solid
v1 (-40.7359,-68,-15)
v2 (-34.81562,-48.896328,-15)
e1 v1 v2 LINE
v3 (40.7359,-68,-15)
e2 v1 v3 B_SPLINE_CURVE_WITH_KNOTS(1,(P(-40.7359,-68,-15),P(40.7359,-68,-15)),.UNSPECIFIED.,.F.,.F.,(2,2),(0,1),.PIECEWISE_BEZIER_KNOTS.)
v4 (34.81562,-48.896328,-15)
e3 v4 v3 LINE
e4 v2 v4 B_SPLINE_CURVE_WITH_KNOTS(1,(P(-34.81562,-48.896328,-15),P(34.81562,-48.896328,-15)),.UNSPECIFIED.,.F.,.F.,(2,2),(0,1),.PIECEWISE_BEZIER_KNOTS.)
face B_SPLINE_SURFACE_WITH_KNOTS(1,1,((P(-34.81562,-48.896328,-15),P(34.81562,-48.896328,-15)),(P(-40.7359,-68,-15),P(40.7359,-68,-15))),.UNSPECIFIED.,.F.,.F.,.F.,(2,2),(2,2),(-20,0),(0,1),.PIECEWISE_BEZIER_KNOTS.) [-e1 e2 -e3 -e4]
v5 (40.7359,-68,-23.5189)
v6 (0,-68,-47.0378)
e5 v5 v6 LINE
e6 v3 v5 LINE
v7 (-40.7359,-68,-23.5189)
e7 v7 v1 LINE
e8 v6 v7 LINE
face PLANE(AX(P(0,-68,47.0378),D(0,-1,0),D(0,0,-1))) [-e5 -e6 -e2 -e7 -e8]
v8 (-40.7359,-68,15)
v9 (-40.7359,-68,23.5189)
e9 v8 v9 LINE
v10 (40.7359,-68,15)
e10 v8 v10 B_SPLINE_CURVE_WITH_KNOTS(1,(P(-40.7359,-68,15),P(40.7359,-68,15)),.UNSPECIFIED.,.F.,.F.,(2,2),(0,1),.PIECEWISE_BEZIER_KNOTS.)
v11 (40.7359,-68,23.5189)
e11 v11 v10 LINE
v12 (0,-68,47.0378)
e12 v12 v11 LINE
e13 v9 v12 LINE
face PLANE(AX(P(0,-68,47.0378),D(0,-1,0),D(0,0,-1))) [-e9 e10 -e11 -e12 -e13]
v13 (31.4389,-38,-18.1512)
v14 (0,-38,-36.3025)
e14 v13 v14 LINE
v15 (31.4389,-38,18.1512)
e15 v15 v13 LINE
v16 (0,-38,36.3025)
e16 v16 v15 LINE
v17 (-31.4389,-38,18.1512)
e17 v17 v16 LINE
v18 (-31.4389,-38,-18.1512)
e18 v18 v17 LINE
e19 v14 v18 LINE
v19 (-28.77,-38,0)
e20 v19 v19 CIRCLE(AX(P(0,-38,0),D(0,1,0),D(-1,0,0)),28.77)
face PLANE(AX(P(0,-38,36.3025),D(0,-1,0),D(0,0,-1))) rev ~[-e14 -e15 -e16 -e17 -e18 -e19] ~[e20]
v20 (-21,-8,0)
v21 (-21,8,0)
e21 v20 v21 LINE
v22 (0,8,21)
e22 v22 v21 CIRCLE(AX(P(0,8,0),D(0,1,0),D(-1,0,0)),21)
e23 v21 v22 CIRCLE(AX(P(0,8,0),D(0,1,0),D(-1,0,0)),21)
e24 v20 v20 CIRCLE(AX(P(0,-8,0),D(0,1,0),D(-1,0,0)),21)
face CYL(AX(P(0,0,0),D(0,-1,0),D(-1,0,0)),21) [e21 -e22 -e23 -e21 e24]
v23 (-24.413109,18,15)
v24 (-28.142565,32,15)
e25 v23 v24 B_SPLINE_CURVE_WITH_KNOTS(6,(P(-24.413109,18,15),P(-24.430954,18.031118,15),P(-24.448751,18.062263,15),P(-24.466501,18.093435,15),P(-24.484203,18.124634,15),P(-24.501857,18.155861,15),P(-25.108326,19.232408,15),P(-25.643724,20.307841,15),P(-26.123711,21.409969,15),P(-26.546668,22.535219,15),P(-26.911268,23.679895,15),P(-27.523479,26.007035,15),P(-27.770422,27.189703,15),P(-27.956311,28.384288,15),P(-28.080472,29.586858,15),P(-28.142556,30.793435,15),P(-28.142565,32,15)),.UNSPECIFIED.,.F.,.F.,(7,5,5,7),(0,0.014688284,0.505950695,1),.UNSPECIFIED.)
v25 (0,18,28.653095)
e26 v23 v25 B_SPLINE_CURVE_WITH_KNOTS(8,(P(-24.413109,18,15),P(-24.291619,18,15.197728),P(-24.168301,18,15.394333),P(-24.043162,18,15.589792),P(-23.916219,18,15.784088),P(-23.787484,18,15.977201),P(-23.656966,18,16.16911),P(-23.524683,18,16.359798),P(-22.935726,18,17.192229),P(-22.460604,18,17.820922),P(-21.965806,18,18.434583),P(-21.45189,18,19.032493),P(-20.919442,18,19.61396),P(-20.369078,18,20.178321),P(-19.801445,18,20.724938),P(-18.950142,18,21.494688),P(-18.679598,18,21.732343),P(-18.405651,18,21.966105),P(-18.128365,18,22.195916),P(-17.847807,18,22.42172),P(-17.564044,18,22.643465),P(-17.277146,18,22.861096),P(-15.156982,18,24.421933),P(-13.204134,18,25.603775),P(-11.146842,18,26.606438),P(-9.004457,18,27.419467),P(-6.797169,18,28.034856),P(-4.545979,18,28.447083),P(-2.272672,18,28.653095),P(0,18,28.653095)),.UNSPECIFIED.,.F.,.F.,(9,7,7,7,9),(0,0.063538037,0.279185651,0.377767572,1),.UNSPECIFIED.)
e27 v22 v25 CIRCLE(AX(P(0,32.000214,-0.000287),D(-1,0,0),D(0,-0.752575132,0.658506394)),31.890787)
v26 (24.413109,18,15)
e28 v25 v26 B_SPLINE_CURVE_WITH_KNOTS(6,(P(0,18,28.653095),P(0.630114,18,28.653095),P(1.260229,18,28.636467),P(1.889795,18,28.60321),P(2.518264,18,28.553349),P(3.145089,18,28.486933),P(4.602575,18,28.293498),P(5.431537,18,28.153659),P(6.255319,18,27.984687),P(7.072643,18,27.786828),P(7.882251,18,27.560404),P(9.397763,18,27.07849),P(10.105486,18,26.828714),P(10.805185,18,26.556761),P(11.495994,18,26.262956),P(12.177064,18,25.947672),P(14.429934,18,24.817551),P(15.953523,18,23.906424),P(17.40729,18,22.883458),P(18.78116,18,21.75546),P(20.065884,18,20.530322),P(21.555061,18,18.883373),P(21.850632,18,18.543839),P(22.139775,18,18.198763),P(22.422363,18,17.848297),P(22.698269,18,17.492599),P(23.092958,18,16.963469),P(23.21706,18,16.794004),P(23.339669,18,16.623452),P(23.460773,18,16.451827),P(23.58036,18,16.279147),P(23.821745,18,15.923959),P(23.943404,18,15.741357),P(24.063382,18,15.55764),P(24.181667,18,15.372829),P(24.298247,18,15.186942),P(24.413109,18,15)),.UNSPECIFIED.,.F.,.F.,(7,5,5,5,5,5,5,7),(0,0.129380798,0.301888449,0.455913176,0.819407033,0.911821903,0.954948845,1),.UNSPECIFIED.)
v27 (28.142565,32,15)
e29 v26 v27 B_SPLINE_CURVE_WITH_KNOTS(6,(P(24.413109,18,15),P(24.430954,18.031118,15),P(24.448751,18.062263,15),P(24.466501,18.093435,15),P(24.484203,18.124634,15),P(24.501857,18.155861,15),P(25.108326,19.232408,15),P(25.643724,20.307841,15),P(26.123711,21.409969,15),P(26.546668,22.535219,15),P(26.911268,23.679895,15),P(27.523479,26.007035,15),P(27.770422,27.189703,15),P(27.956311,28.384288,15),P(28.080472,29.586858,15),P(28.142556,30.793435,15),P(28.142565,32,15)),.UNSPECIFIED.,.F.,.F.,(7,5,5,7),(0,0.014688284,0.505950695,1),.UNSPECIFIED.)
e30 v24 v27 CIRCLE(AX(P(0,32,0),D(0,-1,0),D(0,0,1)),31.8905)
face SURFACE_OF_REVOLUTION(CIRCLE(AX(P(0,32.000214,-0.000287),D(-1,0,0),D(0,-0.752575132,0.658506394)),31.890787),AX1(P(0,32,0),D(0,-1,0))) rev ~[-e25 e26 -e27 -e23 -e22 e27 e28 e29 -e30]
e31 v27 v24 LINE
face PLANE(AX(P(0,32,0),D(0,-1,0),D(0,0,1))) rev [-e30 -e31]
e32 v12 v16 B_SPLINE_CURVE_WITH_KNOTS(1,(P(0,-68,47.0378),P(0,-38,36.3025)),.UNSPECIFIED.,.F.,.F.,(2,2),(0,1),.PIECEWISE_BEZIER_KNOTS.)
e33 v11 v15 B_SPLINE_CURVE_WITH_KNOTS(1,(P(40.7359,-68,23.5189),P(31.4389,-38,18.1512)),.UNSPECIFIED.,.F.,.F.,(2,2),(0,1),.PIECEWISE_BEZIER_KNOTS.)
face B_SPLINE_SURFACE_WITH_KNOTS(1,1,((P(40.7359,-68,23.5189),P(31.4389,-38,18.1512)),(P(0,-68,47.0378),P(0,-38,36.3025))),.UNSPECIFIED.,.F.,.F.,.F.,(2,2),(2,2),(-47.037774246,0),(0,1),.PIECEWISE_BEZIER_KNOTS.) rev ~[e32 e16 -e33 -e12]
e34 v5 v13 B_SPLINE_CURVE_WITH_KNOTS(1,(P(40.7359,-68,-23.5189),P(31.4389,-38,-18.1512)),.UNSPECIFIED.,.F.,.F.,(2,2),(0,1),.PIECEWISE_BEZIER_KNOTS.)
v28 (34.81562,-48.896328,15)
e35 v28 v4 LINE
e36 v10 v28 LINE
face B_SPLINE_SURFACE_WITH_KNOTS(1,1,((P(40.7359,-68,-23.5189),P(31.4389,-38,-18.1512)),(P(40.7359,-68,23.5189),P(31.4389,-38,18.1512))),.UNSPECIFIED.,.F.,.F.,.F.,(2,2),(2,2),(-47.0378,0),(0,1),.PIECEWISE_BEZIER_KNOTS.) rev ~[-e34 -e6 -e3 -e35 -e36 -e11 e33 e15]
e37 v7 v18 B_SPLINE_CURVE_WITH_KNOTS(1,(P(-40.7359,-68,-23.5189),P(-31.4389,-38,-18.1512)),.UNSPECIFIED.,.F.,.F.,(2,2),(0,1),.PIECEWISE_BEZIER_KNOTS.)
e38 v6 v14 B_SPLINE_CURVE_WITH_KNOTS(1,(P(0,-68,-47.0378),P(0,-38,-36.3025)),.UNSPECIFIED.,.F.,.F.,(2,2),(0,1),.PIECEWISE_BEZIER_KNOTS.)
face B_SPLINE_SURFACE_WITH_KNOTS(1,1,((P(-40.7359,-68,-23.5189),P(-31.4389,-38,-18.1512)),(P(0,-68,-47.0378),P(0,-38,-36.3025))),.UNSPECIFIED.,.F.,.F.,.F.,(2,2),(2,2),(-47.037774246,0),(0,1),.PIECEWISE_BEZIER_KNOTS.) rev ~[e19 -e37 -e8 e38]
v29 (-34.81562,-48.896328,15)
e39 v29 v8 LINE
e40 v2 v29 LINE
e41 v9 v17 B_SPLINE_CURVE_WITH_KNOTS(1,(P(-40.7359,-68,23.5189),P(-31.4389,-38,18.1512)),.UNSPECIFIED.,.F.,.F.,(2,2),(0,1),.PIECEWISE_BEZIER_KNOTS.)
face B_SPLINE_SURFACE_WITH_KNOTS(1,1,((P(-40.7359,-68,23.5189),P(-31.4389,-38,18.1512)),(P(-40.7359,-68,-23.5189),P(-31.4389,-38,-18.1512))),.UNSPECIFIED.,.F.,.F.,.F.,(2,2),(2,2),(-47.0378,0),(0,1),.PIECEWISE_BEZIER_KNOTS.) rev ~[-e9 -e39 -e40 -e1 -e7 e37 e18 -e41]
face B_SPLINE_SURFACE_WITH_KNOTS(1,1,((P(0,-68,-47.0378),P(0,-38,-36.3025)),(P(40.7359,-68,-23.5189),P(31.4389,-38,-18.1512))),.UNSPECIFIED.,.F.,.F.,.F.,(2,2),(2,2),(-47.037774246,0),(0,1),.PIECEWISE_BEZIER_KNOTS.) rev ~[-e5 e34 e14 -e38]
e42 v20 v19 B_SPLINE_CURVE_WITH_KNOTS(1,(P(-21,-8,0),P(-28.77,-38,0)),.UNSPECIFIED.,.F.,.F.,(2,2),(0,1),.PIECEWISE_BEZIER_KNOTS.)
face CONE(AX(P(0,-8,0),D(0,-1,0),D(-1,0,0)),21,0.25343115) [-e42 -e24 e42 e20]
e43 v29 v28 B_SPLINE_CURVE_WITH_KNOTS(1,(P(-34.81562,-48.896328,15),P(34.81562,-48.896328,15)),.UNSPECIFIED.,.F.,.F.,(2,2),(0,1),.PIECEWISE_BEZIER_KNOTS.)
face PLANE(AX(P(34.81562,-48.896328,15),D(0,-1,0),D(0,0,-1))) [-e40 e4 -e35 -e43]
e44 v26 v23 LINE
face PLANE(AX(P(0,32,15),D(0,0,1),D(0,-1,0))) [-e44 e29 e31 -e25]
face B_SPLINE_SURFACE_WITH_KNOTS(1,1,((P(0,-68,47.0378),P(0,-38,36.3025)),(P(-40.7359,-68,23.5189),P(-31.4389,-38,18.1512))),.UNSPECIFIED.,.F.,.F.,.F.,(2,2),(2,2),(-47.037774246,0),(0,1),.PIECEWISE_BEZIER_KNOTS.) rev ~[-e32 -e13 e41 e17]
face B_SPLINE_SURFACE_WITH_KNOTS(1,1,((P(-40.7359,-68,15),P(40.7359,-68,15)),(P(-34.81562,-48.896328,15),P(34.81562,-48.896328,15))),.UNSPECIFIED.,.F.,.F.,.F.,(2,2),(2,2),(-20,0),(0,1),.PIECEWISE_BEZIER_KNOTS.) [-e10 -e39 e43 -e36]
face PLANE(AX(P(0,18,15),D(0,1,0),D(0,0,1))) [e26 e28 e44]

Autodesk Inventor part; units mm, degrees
ref_plane "YZ Plane" through (0, 0, 0) normal (1, 0, 0) x (0, 1, 0)
ref_plane "XZ Plane" through (0, 0, 0) normal (0, 1, 0) x (-1, 0, 0)
ref_plane "XY Plane" through (0, 0, 0) normal (0, 0, 1) x (1, 0, 0)
sketch "Sketch2" plane through (0, 0, 0) normal (0, 1, 0) x (-1, 0, 0)
  circle A0 centre (0, 0) radius 21
  dimension "d1" = 42
extrude "Extrusion1" add sketch "Sketch2" along normal mid plane 16
sketch "Sketch3" plane through (0, -8, 0) normal (0, -1, 0) x (1, 0, 0)
  circle A0 centre (0, 0) radius 21
  dimension "d4" = 42
ref_plane "Work Plane1" through (0, -38, 0) normal (0, -1, 0) x (1, 0, 0)
sketch "Sketch4" plane through (0, -38, 0) normal (0, -1, 0) x (1, 0, 0)
  circle A0 centre (0, 0) radius 28.77
  dimension "d6" = 57.54
loft "Loft1" add profiles "Sketch4" section 1 edges at (21, -8, 0)
sketch "Sketch5" plane through (0, -38, 0) normal (0, -1, 0) x (1, 0, 0)
  circle A0 centre (0, 0) radius 28.77 projected
  line L0 (0, 0) -> (28.77, 0) construction
  line L1 (0, 36.3025) -> (31.4389, 18.1512)
  line L2 (31.4389, 18.1512) -> (31.4389, -18.1512)
  line L3 (31.4389, -18.1512) -> (0, -36.3025)
  line L4 (0, -36.3025) -> (-31.4389, -18.1512)
  line L5 (-31.4389, -18.1512) -> (-31.4389, 18.1512)
  line L6 (-31.4389, 18.1512) -> (0, 36.3025)
ref_plane "Work Plane2" through (0, -68, 0) normal (0, -1, 0) x (1, 0, 0)
sketch "Sketch6" plane through (0, -38, 0) normal (0, -1, 0) x (1, 0, 0)
  point P0 (0, 0)
sketch "Sketch8" plane through (0, -68, 0) normal (0, -1, 0) x (1, 0, 0)
  line L0 (0, 47.0378) -> (40.7359, 23.5189)
  line L1 (40.7359, 23.5189) -> (40.7359, -23.5189)
  line L2 (40.7359, -23.5189) -> (0, -47.0378)
  line L3 (0, -47.0378) -> (-40.7359, -23.5189)
  line L4 (-40.7359, -23.5189) -> (-40.7359, 23.5189)
  line L5 (-40.7359, 23.5189) -> (0, 47.0378)
  point P0 (0, 0)
  point P1 (0, 0)
loft "Loft3" add profiles "Sketch8", "Sketch5" contours all / A0 | L1 L2 L3 L4 L5 L6
sketch "Sketch9" plane through (-40.7359, -68, -23.5189) normal (-0.9551836, 0.296014, 0) x (0, 0, 1)
  line L0 (0, 0) -> (47.0378, 0) projected
  line L1 (23.5189, 0) -> (16.0189, 0)
  line L2 (31.0189, 0) -> (23.5189, 0)
  line L3 (31.0189, 0) -> (16.0189, 0)
  line L4 (16.0189, 20) -> (31.0189, 20)
  line L5 (23.5189, 0) -> (8.5189, 0)
  line L6 (8.5189, 0) -> (8.5189, 20)
  line L7 (8.5189, 20) -> (38.5189, 20)
  line L8 (38.5189, 20) -> (38.5189, 0)
  point P0 (23.5189, 77.0109)
  dimension "d40" = 15
  dimension "d41" = 20
  dimension "d42" = 30
sketch "Sketch10" plane through (40.7359, -68, 23.5189) normal (0.9551836, 0.296014, 0) x (0, 0, -1)
  line L0 (38.5189, 20) -> (38.5189, 0)
  line L1 (8.5189, 0) -> (8.5189, 20)
  line L2 (8.5189, 20) -> (38.5189, 20)
  line L3 (38.5189, 20) -> (38.5189, 0)
  line L4 (0, 0) -> (47.0378, 0) projected
  line L5 (8.5189, 0) -> (38.5189, 0)
  point P0 (23.5189, 77.0109)
  point P1 (23.5189, 0)
  point P2 (53.5189, 0)
  point P3 (23.5189, 0)
loft "Loft4" cut profiles "Sketch9", "Sketch10"
ref_plane "Work Plane4" through (0, 63.4475, -18.1512) normal (-1, 0, 0) x (0, 0, 1)
sketch "Sketch12" plane through (0, 63.4475, -18.1512) normal (-1, 0, 0) x (0, 0, 1)
  line L0 (39.1512, -55.4475) -> (-2.8488, -55.4475) projected
  line L1 (18.1512, -55.4475) -> (39.1512, -55.4475)
  arc A0 (39.1512, -55.4475) -> (50.0417, -31.4475) centre (18.1512, -31.4475) ccw
  line L2 (18.1512, -31.4475) -> (50.0417, -31.4475)
  line L3 (18.1512, -31.4475) -> (18.1512, -55.4475)
  line L4 (18.1512, -55.4475) -> (39.1512, -55.4475)
  point P0 (18.1512, -63.4475)
revolve "Revolution1" add sketch "Sketch12" angle 360 about axis through (0, 32, 0) along (0, -1, 0)
sketch "Sketch14" plane through (0, 63.4475, -18.1512) normal (-1, 0, 0) x (0, 0, 1)
  line L0 (-13.7392, -31.4475) -> (50.0417, -31.4475) projected
  line L1 (18.1512, -31.4475) -> (33.1512, -31.4475)
  line L2 (18.1512, -31.4475) -> (33.1512, -31.4475) construction
  line L3 (33.1512, -31.4475) -> (33.1512, -45.4475)
  line L4 (33.1512, -45.4475) -> (50.0417, -45.4475)
  line L5 (50.0417, -45.4475) -> (50.0417, -31.4475)
  line L6 (50.0417, -31.4475) -> (33.1512, -31.4475)
  point P0 (18.1512, -63.4475)
  point P1 (33.1512, -31.4475)
  dimension "d47" = 14
  dimension "d48" = 90
  dimension "d49" = 90
extrude "Extrusion2" cut sketch "Sketch14" along normal mid plane 70
